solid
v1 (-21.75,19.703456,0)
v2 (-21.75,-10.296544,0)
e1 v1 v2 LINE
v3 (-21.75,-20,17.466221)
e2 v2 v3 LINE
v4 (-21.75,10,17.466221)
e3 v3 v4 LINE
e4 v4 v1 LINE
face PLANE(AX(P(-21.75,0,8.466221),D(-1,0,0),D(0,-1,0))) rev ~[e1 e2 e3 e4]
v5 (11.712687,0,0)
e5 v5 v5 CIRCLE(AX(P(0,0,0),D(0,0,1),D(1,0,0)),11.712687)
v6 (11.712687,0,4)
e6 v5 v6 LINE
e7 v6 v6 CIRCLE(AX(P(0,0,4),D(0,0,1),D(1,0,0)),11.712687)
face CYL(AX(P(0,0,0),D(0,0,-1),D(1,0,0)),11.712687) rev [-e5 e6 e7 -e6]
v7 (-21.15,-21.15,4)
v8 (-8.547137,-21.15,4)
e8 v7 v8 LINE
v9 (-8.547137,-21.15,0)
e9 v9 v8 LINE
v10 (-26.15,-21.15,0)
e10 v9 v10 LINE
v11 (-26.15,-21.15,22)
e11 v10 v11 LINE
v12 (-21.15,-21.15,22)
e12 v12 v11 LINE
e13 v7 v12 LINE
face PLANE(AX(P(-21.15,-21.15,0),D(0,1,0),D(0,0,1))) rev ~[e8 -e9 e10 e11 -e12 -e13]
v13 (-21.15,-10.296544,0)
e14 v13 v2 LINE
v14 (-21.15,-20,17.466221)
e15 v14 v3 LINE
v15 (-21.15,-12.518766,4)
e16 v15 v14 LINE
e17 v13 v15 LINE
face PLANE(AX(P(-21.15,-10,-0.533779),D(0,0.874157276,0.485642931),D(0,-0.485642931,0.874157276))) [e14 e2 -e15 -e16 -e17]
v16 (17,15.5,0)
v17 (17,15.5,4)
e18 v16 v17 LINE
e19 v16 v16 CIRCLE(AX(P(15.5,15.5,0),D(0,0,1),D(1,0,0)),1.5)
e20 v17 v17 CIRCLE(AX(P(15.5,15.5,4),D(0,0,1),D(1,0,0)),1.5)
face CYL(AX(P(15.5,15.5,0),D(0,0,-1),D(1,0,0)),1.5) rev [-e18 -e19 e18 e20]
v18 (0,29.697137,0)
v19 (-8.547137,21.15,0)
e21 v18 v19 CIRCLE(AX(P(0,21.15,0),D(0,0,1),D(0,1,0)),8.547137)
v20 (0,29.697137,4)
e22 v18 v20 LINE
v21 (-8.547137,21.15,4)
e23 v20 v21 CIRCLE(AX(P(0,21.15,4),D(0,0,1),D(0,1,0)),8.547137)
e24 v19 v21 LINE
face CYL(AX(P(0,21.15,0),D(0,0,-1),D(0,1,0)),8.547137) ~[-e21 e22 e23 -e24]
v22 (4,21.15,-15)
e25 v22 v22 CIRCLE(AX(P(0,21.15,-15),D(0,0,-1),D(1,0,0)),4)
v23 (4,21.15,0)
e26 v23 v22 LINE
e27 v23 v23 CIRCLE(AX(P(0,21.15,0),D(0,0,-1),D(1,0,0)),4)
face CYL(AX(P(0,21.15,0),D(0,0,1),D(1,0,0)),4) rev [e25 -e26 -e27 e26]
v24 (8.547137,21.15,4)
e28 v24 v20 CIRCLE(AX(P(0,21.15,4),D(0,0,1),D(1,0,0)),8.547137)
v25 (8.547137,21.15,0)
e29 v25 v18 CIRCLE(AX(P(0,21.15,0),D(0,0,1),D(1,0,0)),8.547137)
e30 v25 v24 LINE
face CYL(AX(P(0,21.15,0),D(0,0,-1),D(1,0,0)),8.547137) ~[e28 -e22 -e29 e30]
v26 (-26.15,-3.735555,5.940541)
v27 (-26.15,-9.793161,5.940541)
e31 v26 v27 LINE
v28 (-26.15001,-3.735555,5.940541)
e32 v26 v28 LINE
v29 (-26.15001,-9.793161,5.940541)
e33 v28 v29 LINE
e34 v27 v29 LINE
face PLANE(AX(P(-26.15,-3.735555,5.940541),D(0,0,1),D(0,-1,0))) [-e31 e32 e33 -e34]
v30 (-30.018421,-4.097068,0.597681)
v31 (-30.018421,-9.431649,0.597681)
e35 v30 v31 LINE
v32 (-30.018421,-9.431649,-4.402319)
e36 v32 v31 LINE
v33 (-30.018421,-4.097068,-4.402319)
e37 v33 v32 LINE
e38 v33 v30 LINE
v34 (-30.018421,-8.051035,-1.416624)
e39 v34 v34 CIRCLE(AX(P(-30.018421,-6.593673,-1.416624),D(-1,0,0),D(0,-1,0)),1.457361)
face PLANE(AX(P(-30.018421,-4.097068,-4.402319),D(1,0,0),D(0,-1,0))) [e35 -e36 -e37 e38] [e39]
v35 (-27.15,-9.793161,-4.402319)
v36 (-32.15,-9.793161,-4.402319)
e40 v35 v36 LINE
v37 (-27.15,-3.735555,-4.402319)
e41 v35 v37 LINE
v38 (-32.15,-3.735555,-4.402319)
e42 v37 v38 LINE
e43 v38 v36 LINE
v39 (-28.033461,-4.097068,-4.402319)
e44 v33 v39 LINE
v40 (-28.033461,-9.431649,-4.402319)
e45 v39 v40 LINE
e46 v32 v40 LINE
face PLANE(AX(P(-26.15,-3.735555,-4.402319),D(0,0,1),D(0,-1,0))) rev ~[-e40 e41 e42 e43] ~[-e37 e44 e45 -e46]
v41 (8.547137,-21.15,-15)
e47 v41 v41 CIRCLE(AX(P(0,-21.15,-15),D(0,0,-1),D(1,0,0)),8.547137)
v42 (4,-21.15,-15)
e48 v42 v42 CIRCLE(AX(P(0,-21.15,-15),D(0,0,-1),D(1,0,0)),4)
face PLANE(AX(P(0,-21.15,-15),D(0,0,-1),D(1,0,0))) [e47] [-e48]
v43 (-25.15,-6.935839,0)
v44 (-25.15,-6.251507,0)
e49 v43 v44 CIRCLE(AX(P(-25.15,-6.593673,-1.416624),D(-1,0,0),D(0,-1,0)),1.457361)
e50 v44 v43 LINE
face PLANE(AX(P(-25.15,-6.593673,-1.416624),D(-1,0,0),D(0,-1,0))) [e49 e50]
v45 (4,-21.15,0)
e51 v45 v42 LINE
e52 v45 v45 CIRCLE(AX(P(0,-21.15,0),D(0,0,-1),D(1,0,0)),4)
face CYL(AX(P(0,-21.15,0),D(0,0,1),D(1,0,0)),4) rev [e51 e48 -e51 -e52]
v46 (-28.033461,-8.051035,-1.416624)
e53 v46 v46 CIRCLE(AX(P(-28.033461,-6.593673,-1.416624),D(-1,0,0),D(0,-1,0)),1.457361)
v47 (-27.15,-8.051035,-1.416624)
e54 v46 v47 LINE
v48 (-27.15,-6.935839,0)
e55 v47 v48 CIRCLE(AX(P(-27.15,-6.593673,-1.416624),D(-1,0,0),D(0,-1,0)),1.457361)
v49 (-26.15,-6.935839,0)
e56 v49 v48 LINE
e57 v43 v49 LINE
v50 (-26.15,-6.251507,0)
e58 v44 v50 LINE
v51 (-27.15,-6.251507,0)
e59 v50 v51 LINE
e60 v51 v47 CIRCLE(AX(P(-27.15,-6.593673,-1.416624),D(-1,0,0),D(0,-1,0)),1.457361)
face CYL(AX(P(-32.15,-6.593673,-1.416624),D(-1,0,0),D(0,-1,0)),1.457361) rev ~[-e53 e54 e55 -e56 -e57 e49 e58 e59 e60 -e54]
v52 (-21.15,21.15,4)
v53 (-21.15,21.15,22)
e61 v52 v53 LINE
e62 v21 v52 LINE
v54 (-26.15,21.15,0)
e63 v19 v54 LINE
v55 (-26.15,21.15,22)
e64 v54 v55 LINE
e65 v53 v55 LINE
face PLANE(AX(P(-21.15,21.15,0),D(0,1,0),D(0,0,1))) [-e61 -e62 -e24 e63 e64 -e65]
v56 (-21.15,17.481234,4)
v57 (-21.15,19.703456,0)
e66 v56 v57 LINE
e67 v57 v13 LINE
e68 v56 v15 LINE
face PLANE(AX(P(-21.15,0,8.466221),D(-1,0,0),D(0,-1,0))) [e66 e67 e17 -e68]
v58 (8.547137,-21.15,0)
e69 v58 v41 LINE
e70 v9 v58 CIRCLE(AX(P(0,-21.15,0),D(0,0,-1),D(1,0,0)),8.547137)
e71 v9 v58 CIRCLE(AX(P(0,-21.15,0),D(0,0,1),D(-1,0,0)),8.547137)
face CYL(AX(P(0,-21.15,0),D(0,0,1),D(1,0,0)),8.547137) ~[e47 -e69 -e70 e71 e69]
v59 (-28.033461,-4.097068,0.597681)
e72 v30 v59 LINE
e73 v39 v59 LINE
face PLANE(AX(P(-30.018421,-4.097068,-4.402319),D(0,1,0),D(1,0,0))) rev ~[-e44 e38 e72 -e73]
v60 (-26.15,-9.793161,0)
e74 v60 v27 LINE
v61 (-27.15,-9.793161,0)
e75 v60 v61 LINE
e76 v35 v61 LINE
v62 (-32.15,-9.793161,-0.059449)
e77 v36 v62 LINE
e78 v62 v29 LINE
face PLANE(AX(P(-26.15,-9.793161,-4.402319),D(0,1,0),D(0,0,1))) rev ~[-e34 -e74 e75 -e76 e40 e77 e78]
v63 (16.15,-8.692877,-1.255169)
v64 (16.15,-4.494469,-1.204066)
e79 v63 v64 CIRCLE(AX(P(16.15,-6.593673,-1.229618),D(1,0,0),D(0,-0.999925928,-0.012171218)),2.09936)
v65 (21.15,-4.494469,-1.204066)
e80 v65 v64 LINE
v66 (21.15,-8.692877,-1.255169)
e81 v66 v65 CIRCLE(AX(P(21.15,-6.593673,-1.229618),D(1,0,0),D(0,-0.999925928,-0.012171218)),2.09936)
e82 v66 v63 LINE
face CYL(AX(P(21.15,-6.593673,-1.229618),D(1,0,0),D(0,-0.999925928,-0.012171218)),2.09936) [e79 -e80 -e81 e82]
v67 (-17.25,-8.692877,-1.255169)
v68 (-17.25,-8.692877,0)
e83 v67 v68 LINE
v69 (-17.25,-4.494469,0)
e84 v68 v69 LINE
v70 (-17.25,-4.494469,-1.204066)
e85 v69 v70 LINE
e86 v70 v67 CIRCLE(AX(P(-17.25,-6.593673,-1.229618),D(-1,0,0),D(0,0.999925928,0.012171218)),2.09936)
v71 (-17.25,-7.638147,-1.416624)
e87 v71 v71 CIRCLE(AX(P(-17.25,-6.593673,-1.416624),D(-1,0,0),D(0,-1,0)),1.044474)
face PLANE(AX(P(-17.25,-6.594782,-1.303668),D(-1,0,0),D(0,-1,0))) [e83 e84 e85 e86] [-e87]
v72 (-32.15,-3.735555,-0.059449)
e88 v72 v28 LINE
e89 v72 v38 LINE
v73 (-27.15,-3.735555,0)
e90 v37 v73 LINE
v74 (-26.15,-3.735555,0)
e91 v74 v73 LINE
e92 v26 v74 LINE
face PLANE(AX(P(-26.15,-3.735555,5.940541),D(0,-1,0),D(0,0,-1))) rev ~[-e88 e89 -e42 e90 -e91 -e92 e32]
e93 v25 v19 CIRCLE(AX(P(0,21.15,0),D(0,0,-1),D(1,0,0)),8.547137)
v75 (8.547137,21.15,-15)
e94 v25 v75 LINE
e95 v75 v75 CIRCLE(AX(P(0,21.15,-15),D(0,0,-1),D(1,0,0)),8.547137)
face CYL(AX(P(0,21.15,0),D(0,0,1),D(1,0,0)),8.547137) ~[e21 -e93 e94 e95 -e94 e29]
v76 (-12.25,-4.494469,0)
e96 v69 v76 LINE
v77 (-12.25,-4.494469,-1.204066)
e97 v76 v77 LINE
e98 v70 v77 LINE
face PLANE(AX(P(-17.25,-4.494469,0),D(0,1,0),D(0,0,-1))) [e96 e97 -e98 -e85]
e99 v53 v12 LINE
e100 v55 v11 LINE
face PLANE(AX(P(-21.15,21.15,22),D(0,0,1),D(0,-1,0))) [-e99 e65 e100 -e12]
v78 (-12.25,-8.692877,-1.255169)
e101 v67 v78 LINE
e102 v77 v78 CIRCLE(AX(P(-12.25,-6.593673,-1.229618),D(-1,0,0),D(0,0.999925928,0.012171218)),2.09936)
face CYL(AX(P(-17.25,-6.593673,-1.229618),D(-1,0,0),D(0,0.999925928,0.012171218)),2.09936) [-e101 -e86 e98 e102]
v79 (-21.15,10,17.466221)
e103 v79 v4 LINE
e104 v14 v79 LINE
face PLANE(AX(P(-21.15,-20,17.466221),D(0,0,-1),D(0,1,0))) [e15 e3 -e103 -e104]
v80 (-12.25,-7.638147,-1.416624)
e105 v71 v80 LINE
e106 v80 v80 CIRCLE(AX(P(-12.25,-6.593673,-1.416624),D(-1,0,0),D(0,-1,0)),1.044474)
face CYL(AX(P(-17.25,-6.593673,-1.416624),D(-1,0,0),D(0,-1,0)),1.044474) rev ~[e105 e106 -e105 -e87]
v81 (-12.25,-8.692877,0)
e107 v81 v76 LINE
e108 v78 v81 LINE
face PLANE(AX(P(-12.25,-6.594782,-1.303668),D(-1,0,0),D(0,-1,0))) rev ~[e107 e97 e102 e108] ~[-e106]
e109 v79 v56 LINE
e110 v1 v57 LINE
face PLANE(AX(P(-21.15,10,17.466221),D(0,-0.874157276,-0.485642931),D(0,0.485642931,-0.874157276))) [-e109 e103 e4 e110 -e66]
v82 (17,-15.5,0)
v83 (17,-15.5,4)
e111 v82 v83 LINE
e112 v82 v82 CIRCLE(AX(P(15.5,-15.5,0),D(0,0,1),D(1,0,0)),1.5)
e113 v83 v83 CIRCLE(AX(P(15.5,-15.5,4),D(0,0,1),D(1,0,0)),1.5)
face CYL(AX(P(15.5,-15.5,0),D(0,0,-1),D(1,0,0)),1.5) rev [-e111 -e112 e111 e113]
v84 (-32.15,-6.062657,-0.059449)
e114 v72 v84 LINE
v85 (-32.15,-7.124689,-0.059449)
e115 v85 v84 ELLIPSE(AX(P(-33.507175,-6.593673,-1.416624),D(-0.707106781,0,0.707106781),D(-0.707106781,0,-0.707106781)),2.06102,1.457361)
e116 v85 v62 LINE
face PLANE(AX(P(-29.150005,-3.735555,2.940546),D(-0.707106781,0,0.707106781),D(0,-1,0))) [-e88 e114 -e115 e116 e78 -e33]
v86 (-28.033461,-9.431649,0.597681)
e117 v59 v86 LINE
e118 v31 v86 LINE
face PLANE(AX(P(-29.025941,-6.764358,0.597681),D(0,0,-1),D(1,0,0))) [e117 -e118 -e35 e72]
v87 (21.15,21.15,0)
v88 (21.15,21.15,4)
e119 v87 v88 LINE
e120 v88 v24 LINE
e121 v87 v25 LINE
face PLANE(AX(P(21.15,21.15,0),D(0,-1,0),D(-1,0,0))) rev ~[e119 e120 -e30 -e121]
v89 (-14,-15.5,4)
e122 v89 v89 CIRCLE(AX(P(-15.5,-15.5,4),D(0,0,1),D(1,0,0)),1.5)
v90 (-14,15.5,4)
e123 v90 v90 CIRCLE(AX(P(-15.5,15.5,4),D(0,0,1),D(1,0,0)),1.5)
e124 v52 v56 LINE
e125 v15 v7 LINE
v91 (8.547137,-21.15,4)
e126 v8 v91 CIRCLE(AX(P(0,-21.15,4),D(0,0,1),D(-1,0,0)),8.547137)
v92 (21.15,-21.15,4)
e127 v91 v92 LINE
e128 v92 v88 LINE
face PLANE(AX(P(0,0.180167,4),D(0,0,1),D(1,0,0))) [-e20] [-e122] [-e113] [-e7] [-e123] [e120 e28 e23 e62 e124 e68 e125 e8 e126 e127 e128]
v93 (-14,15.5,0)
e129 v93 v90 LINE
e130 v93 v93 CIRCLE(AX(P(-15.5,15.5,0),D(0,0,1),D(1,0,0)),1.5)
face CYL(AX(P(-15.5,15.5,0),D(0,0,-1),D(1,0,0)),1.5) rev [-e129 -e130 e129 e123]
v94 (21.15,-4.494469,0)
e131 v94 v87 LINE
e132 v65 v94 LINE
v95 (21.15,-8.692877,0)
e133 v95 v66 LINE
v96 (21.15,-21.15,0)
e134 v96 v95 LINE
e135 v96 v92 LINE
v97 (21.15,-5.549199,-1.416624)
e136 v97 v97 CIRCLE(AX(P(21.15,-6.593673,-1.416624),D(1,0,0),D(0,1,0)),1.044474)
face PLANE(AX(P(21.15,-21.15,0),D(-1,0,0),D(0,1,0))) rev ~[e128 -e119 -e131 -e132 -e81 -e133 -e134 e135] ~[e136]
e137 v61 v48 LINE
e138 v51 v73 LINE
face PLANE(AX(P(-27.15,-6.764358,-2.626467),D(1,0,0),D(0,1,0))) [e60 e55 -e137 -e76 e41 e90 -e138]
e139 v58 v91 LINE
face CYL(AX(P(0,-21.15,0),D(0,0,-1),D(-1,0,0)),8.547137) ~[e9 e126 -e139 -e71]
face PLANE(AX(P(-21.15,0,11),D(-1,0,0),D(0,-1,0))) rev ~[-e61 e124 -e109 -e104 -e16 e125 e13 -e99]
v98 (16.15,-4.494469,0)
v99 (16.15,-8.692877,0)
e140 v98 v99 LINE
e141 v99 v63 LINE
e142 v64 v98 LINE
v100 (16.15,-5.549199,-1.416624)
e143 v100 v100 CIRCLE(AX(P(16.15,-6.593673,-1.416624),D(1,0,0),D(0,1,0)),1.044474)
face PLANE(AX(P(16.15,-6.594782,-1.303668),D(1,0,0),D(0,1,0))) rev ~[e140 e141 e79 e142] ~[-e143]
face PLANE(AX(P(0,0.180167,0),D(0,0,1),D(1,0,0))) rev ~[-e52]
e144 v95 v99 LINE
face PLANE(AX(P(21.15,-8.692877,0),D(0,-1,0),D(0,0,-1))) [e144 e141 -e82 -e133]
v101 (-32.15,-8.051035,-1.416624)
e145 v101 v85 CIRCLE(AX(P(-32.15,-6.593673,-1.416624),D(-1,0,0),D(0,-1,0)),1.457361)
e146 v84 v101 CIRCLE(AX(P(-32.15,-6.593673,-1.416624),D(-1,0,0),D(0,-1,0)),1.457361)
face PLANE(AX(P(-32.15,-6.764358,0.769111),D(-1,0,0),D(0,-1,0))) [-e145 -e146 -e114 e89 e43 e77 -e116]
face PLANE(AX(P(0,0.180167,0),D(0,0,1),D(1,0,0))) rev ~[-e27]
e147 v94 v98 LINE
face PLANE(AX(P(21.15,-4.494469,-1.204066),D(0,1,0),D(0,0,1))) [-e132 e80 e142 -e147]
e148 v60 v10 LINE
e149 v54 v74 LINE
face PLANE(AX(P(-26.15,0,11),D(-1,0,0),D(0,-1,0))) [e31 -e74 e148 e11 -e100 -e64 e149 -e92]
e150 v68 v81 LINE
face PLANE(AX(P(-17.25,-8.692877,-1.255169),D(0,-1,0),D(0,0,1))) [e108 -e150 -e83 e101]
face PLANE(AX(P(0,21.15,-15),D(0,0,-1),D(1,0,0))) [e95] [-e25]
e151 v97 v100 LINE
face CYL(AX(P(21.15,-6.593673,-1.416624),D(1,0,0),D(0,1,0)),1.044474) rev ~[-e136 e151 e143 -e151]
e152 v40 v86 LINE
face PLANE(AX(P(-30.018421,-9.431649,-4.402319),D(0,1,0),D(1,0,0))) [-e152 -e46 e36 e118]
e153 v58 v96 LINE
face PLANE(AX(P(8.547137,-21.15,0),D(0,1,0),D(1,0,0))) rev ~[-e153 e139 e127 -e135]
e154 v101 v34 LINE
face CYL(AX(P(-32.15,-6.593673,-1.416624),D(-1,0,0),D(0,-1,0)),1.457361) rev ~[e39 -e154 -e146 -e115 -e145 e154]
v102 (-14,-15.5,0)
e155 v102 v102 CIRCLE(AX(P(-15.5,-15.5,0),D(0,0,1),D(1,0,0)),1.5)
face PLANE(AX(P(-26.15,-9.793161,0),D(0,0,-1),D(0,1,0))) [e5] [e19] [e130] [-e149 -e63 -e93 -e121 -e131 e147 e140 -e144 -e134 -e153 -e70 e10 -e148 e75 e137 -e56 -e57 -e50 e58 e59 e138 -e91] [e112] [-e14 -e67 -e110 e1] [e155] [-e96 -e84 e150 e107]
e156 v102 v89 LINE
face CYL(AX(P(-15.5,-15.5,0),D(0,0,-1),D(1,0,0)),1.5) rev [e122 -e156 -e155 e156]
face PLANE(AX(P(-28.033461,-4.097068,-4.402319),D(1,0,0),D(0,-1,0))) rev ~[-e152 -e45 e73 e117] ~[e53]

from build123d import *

# Parameters (mm, degrees)
F0_R      = 1.5
F0_R_2    = 11.7126871306
F1_DEPTH  = 4
F2_R      = 4
F3_DEPTH  = 15
F6_DEPTH  = 0.6
F7_W      = 42.3
F7_H      = 22
F8_DEPTH  = 5
F11_R     = 1.0444740365
F12_DEPTH = 5
F14_R     = 1.0444740365
F15_DEPTH = 5
F16_W     = 6.0576063115
F16_H     = 10.3428596631
F16_R     = 1.0444740365
F17_DEPTH = 6
F18_SIZE  = 5.99999
F19_R     = 1.4573614865
F20_DEPTH = 7
F21_W     = 1.9849594682
F21_H     = 5.3345812485
F22_DEPTH = 5
F23_W     = 6.0576063115
F23_H     = 5.2529345267
F24_DEPTH = 1


# Not quite as in the source:
# - a fillet or chamfer is up to 0.001 mm smaller than in the source, because OpenCascade refuses the exact size


with BuildPart() as f1:
    # F0 (on Top) → F1 (new body)
    with BuildSketch(Plane.XY):
        with BuildLine():
            Line((21.15, -21.15), (21.15, 21.15))
            Line((21.15, 21.15), (8.5471369535, 21.15))
            ThreePointArc((8.5471369535, 21.15), (6.0437384995, 27.1937384995), (0, 29.6971369535))
            ThreePointArc((0, 29.6971369535), (-6.0437384995, 27.1937384995), (-8.5471369535, 21.15))
            Line((-8.5471369535, 21.15), (-21.15, 21.15))
            Line((-21.15, 21.15), (-21.15, -21.15))
            Line((-21.15, -21.15), (-8.5471369535, -21.15))
            ThreePointArc((-8.5471369535, -21.15), (0, -29.6971369535), (8.5471369535, -21.15))
            Line((8.5471369535, -21.15), (21.15, -21.15))
        make_face()
        with Locations((-15.5, -15.5)):
            Circle(F0_R, mode=Mode.SUBTRACT)
        with Locations((15.5, -15.5)):
            Circle(F0_R, mode=Mode.SUBTRACT)
        with Locations((-15.5, 15.5)):
            Circle(F0_R, mode=Mode.SUBTRACT)
        Circle(F0_R_2, mode=Mode.SUBTRACT)
        with Locations((15.5, 15.5)):
            Circle(F0_R, mode=Mode.SUBTRACT)
    extrude(amount=F1_DEPTH)

    # F2 (on face) → F3 (join)
    with BuildSketch(Plane(origin=(0, 0, 0), x_dir=(1, 0, 0), z_dir=(0, 0, -1))):
        with BuildLine():
            ThreePointArc((-8.5471369535, 21.15), (0, 12.6028630465), (8.5471369535, 21.15))
            ThreePointArc((8.5471369535, 21.15), (0, 29.6971369535), (-8.5471369535, 21.15))
        make_face()
        with Locations((0, 21.15)):
            Circle(F2_R, mode=Mode.SUBTRACT)
        with BuildLine():
            ThreePointArc((-8.5471369535, -21.15), (0, -29.6971369535), (8.5471369535, -21.15))
            ThreePointArc((8.5471369535, -21.15), (0, -12.6028630465), (-8.5471369535, -21.15))
        make_face()
        with Locations((0, -21.15)):
            Circle(F2_R, mode=Mode.SUBTRACT)
    extrude(amount=F3_DEPTH)

    # F7 (on face) → F8 (join)
    with BuildSketch(Plane(origin=(-21.15, 0, 0), x_dir=(0, -1, 0), z_dir=(-1, 0, 0))):
        with Locations((0, 11)):
            Rectangle(F7_W, F7_H)
    extrude(amount=F8_DEPTH)

    # F9: union 


with BuildPart() as f6:
    # F5 (on offset) → F6 (new body)
    with BuildSketch(Plane(origin=(-21.15, 0, 0), x_dir=(0, -1, 0), z_dir=(-1, 0, 0))):
        Polygon((-10, 17.4662213922), (-20, -0.5337786078), (10, -0.5337786078), (20, 17.4662213922), align=None)
    extrude(amount=F6_DEPTH)


with BuildPart() as f1_1:
    add(f1.part)

    # F10: cut F6
    add(f6.part, mode=Mode.SUBTRACT)

    # F11 (on face) → F12 (join)
    with BuildSketch(Plane.YZ.offset(21.15)):
        with BuildLine():
            Line((-4.4944686815, -1.2040658621), (-4.4944686815, 0))
            Line((-4.4944686815, 0), (-8.6928773671, 0))
            Line((-8.6928773671, 0), (-8.6928773671, -1.2551693944))
            ThreePointArc((-8.6928773671, -1.2551693944), (-6.5681212582, -3.3288219711), (-4.4944686815, -1.2040658621))
        make_face()
        with Locations((-6.5936730243, -1.4166244073)):
            Circle(F11_R, mode=Mode.SUBTRACT)
    extrude(amount=-F12_DEPTH)

    # F14 (on offset) → F15 (join)
    with BuildSketch(Plane(origin=(-17.25, 0, 0), x_dir=(0, -1, 0), z_dir=(-1, 0, 0))):
        with BuildLine():
            Line((8.6928773671, -1.2551693944), (8.6928773671, 0))
            Line((8.6928773671, 0), (4.4944686815, 0))
            Line((4.4944686815, 0), (4.4944686815, -1.2040658621))
            ThreePointArc((4.4944686815, -1.2040658621), (6.5681212582, -3.3288219711), (8.6928773671, -1.2551693944))
        make_face()
        with Locations((6.5936730243, -1.4166244073)):
            Circle(F14_R, mode=Mode.SUBTRACT)
    extrude(amount=-F15_DEPTH)

    # F16 (on face) → F17 (join)
    with BuildSketch(Plane(origin=(-26.15, 0, 0), x_dir=(0, -1, 0), z_dir=(-1, 0, 0))):
        with Locations((6.7643582588, 0.7691108622)):
            Rectangle(F16_W, F16_H)
        with BuildLine():
            ThreePointArc((8.6928773671, -1.2551693944), (6.5681212582, -3.3288219711), (4.4944686815, -1.2040658621))
            Line((4.4944686815, -1.2040658621), (4.4944686815, 0))
            Line((4.4944686815, 0), (8.6928773671, 0))
            Line((8.6928773671, 0), (8.6928773671, -1.2551693944))
        make_face(mode=Mode.SUBTRACT)
        with BuildLine():
            ThreePointArc((8.6928773671, -1.2551693944), (6.5681212582, -3.3288219711), (4.4944686815, -1.2040658621))
            Line((4.4944686815, -1.2040658621), (4.4944686815, 0))
            Line((4.4944686815, 0), (3.735555103, 0))
            Line((3.735555103, 0), (3.735555103, -4.4023189694))
            Line((3.735555103, -4.4023189694), (9.7931614146, -4.4023189694))
            Line((9.7931614146, -4.4023189694), (9.7931614146, 0))
            Line((9.7931614146, 0), (8.6928773671, 0))
            Line((8.6928773671, 0), (8.6928773671, -1.2551693944))
        make_face()
        with BuildLine():
            Line((4.4944686815, 0), (4.4944686815, -1.2040658621))
            ThreePointArc((4.4944686815, -1.2040658621), (6.5681212582, -3.3288219711), (8.6928773671, -1.2551693944))
            Line((8.6928773671, -1.2551693944), (8.6928773671, 0))
            Line((8.6928773671, 0), (4.4944686815, 0))
        make_face()
        with Locations((6.5936730243, -1.4166244073)):
            Circle(F16_R, mode=Mode.SUBTRACT)
    extrude(amount=F17_DEPTH)

    # F18 (size 6 in the source; OpenCascade refuses exactly that, so slightly less here)
    f18_edges = [f1_1.edges().sort_by_distance(p)[0] for p in [
        (-32.15, -6.764358, 5.940541),
    ]]
    chamfer(f18_edges, length=F18_SIZE)

    # F19 (on face) → F20 (cut)
    with BuildSketch(Plane(origin=(-32.15, 0, 0), x_dir=(0, -1, 0), z_dir=(-1, 0, 0))):
        with Locations((6.5936730243, -1.4166244073)):
            Circle(F19_R)
    extrude(amount=-F20_DEPTH, mode=Mode.SUBTRACT)

    # F21 (on face) → F22 (cut)
    with BuildSketch(Plane(origin=(0, 0, -4.4023189694), x_dir=(1, 0, 0), z_dir=(0, 0, -1))):
        with Locations((-29.0259411559, 6.7643583752)):
            Rectangle(F21_W, F21_H)
    extrude(amount=-F22_DEPTH, mode=Mode.SUBTRACT)

    # F23 (on face) → F24 (cut)
    with BuildSketch(Plane.YZ.offset(-26.15)):
        with Locations((-6.7643582588, -2.6264672633)):
            Rectangle(F23_W, F23_H)
    extrude(amount=-F24_DEPTH, mode=Mode.SUBTRACT)


solid = f1_1.part
